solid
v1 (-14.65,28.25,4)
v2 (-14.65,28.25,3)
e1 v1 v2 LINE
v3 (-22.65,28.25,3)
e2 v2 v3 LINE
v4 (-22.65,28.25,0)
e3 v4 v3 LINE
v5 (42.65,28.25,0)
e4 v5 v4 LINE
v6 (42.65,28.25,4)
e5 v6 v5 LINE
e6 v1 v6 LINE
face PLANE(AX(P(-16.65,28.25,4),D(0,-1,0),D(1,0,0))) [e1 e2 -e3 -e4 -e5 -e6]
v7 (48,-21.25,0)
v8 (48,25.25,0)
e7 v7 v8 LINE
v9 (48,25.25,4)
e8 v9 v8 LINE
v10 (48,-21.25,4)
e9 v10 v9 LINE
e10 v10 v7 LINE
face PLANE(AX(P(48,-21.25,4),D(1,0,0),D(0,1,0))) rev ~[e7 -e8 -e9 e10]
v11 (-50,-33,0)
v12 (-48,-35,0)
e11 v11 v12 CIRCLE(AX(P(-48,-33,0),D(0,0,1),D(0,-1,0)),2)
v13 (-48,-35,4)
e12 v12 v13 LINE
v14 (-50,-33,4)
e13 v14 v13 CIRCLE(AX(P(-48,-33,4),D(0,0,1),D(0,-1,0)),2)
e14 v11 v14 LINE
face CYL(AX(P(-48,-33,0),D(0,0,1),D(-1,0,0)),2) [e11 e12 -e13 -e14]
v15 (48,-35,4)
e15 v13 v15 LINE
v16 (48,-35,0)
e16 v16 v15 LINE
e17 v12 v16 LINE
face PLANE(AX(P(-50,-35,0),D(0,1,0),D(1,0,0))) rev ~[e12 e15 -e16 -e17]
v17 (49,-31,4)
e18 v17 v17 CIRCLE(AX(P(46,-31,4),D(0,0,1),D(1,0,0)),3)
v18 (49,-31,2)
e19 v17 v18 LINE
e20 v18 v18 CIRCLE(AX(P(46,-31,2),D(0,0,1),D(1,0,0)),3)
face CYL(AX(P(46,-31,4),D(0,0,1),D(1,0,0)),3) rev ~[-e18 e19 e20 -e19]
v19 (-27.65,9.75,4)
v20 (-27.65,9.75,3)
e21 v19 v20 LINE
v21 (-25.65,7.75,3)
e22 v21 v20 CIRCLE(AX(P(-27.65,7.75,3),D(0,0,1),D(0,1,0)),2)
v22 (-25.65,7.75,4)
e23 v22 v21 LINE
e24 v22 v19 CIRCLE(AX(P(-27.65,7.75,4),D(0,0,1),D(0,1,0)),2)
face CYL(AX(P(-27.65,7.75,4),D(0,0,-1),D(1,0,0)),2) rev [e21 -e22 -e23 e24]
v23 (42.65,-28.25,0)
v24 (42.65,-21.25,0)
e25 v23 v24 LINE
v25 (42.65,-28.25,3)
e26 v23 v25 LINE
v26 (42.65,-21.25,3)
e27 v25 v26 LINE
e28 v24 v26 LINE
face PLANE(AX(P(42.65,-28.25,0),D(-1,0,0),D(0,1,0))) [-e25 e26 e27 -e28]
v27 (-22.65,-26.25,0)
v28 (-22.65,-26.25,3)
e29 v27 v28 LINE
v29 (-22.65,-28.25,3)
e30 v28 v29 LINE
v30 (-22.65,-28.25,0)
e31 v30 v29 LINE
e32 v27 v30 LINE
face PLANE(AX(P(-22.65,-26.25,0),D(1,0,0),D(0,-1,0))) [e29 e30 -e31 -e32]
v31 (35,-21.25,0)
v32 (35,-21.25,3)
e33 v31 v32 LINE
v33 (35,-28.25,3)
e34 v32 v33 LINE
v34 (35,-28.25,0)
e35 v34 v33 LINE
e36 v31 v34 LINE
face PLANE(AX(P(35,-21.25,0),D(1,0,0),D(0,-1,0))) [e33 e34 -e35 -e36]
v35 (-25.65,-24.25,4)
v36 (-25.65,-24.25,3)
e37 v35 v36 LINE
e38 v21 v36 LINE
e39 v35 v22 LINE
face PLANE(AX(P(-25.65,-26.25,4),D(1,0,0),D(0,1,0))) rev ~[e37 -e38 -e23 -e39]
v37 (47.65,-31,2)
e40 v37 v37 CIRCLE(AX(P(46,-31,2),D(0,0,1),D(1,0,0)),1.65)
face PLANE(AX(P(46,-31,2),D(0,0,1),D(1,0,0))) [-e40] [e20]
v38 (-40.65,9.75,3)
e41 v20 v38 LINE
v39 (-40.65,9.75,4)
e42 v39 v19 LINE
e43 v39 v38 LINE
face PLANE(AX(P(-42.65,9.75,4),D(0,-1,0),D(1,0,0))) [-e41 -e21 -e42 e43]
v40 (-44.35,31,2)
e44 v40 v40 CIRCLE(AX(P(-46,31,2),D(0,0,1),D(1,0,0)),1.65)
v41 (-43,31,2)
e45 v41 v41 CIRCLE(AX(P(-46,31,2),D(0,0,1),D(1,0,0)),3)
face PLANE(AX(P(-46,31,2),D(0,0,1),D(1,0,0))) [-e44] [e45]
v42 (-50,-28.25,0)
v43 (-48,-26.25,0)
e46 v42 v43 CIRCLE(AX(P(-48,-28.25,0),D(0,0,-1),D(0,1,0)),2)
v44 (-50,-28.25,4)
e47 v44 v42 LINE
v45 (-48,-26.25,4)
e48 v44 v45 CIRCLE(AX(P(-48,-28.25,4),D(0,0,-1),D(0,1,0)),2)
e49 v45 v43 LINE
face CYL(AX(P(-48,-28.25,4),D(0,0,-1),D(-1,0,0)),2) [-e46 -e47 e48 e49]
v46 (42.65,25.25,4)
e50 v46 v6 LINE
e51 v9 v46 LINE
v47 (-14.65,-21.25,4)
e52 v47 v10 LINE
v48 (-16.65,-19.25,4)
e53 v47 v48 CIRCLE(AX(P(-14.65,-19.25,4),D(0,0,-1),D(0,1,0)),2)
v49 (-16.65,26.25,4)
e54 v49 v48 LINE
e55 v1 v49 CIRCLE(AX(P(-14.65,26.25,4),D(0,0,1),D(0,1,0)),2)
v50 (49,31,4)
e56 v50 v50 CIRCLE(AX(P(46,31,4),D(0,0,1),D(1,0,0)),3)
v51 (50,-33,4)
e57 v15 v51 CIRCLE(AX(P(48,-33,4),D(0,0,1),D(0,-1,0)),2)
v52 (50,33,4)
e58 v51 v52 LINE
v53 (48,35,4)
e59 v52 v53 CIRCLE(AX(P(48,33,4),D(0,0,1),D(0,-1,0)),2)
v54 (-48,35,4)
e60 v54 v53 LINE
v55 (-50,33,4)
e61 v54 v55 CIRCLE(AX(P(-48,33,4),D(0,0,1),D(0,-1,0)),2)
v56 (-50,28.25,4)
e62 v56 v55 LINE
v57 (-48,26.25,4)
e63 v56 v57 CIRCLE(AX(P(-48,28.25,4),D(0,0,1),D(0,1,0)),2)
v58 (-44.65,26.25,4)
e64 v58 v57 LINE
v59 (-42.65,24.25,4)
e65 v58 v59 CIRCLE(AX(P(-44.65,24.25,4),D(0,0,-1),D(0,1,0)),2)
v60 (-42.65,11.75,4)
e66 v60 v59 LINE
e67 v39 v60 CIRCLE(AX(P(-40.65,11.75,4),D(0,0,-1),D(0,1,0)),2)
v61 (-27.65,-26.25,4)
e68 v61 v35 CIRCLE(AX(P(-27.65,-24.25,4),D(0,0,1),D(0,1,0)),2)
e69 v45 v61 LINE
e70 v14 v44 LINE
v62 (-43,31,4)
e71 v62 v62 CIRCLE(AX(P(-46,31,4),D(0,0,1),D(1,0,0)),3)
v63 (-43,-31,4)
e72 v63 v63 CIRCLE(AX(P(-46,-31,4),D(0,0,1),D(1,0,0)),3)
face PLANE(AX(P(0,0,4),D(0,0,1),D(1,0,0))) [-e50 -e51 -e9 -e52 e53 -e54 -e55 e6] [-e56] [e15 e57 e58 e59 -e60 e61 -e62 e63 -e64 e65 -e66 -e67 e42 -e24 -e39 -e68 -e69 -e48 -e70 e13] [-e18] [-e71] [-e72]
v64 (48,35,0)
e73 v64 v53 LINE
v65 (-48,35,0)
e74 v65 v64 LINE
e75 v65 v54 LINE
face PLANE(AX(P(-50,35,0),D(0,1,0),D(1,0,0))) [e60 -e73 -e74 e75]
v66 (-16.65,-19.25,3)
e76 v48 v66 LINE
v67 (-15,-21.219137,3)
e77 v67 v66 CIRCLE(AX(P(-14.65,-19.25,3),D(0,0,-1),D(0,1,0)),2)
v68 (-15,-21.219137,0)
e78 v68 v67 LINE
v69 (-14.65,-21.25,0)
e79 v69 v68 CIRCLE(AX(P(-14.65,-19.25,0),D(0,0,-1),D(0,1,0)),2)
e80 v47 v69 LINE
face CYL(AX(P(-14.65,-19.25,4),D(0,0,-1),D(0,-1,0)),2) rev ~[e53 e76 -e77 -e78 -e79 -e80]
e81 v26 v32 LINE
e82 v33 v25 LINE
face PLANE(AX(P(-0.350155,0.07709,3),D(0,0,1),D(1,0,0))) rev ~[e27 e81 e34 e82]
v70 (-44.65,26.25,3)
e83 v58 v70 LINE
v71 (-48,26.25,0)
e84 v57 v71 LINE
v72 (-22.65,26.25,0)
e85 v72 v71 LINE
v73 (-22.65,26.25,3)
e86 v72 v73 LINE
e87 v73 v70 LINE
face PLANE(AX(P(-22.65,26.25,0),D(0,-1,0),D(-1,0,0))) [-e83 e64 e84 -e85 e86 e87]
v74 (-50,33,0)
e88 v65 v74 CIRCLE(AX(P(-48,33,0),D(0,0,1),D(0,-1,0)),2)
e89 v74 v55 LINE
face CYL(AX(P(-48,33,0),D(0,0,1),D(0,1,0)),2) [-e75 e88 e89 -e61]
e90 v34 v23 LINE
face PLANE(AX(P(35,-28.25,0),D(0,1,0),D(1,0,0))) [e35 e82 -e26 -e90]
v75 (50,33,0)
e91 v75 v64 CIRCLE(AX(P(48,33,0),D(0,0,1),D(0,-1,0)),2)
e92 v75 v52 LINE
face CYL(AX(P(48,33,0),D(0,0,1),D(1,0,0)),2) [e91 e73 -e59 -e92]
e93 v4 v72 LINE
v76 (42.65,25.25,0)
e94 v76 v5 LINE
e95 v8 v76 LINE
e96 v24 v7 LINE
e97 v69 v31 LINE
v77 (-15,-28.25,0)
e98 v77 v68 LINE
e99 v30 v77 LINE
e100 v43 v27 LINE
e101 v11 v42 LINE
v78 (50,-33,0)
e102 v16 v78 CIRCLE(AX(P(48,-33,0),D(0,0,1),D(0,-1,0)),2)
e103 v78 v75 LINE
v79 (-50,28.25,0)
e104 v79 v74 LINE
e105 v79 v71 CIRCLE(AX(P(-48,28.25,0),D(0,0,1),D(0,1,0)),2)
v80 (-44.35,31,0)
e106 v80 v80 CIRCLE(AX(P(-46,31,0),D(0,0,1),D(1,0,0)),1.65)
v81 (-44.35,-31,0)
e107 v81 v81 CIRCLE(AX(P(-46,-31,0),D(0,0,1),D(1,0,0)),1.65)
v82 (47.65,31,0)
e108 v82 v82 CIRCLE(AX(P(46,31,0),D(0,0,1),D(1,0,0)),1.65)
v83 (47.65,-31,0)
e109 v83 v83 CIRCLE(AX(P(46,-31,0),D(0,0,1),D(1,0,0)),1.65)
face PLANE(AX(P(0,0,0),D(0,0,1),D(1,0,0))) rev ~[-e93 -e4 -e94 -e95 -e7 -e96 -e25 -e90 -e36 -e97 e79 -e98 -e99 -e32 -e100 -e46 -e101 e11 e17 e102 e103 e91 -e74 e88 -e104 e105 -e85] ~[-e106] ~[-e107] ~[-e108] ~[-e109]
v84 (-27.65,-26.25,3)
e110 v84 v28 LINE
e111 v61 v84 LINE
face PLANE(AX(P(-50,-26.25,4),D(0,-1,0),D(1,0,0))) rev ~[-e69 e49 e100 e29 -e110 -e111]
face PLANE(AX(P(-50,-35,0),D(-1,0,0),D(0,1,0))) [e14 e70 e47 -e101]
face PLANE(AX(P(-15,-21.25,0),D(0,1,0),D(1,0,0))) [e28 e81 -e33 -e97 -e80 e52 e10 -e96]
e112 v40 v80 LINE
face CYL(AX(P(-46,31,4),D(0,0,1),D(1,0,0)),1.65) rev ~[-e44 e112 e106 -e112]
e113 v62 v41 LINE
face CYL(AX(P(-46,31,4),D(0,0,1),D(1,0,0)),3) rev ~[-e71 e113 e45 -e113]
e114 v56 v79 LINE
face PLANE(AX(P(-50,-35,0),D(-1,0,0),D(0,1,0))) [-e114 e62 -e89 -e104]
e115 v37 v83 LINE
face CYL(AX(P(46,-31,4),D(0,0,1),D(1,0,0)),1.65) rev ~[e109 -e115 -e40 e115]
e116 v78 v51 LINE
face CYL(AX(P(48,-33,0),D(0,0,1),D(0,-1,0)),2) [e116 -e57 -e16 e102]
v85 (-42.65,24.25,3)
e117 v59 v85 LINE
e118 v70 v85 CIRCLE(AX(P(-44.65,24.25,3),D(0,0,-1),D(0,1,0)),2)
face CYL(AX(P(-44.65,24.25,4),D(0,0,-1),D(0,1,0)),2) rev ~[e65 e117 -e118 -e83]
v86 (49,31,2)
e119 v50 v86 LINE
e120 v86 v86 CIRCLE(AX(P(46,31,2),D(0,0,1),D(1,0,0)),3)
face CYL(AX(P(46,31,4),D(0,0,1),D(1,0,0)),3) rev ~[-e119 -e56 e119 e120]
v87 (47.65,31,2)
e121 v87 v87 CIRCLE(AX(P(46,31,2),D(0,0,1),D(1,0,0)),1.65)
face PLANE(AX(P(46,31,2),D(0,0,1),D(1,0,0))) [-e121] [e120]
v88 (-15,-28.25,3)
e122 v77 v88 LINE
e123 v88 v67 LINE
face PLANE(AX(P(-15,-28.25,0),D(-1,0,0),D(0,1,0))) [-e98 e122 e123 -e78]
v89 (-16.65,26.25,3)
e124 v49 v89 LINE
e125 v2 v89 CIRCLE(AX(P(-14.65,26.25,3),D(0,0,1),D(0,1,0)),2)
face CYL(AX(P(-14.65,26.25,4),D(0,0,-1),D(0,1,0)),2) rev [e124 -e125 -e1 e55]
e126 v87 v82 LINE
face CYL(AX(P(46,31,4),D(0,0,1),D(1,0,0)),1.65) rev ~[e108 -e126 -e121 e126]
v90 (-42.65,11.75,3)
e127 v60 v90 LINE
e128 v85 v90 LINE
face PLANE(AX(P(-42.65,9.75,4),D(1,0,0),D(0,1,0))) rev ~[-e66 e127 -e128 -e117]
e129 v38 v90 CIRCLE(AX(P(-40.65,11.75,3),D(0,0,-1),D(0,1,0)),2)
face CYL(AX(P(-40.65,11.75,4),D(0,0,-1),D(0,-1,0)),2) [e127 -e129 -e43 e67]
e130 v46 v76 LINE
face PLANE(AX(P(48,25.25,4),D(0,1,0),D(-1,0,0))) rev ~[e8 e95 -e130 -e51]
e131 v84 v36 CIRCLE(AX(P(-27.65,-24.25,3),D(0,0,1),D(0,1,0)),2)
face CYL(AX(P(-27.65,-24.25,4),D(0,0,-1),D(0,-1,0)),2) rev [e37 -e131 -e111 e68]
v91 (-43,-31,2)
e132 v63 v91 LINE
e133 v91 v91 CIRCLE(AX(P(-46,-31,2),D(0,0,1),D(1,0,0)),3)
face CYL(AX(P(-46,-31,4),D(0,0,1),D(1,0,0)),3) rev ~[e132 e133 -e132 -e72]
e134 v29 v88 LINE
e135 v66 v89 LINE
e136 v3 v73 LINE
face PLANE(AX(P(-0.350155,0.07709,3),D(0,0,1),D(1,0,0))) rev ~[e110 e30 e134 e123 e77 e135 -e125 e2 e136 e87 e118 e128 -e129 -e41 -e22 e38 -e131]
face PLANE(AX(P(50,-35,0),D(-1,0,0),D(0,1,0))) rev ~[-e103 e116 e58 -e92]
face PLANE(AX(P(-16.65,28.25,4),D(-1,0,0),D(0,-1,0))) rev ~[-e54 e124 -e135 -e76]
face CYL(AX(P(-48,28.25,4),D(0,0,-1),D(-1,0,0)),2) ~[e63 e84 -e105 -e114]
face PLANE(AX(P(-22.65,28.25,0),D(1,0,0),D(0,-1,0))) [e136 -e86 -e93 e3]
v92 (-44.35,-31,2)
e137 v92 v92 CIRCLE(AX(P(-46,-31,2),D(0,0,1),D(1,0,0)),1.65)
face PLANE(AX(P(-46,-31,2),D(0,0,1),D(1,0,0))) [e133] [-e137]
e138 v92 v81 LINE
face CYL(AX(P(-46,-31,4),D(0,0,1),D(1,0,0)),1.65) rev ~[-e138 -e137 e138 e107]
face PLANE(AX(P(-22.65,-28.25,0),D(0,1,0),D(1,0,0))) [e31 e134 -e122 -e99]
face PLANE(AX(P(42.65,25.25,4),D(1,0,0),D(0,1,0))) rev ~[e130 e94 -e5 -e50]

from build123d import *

# Parameters (mm, degrees)
F0_W     = 100
F0_H     = 70
F1_DEPTH = 4
F2_R     = 1.65
F3_DEPTH = 4
F2_W     = 17
F2_H     = 36
F2_W_2   = 59.3
F2_H_2   = 3
F4_DEPTH = 4
F6_DEPTH = 3
F7_R     = 3
F8_DEPTH = 2
F9_R     = 2


with BuildPart() as f1:
    # F0 (on Top) → F1 (new body)
    with BuildSketch(Plane.XY):
        Rectangle(F0_W, F0_H)
    extrude(amount=F1_DEPTH)

    # F2 (on face) → F3 (cut, through all)
    with BuildSketch(Plane.XY.offset(4)):
        with Locations((-46, 31)):
            Circle(F2_R)
        with Locations((46, 31)):
            Circle(F2_R)
        with Locations((46, -31)):
            Circle(F2_R)
        with Locations((-46, -31)):
            Circle(F2_R)
    extrude(amount=-F3_DEPTH, mode=Mode.SUBTRACT)

    # F2 (on face) → F4 (cut, through all)
    with BuildSketch(Plane.XY.offset(4)):
        with Locations((-34.15, -8.25)):
            Rectangle(F2_W, F2_H)
        Polygon((-42.65, -26.25), (-42.65, 9.75), (-42.65, 26.25), (-50, 26.25), (-50, -26.25), align=None)
        with Locations((13, 26.75)):
            Rectangle(F2_W_2, F2_H_2)
        Polygon((42.65, 25.25), (-16.65, 25.25), (-16.65, -21.25), (-15, -21.25), (35, -21.25), (42.65, -21.25), (48, -21.25), (48, 25.25), align=None)
    extrude(amount=-F4_DEPTH, mode=Mode.SUBTRACT)

    # F5 (on face) → F6 (cut)
    with BuildSketch(Plane.XY):
        Polygon((-50, -26.25), (-22.65, -26.25), (-22.65, -28.25), (-15, -28.25), (-15, -21.25), (35, -21.25), (35, -28.25), (42.65, -28.25), (42.65, -21.25), (48, -21.25), (48, 25.25), (42.65, 25.25), (42.65, 28.25), (-22.65, 28.25), (-22.65, 26.25), (-50, 26.25), align=None)
    extrude(amount=F6_DEPTH, mode=Mode.SUBTRACT)

    # F7 (on face) → F8 (cut)
    with BuildSketch(Plane.XY.offset(4)):
        with Locations((-46, 31)):
            Circle(F7_R)
        with Locations((46, 31)):
            Circle(F7_R)
        with Locations((46, -31)):
            Circle(F7_R)
        with Locations((-46, -31)):
            Circle(F7_R)
    extrude(amount=-F8_DEPTH, mode=Mode.SUBTRACT)

    # F9
    f9_edges = [f1.edges().sort_by_distance(p)[0] for p in [
        (-50, 35, 2),
        (-50, -35, 2),
        (50, -35, 2),
        (50, 35, 2),
        (-16.65, -21.25, 3.5),
        (-16.65, 28.25, 3.5),
        (-50, 26.25, 2),
        (-50, -26.25, 2),
        (-42.65, 26.25, 3.5),
        (-42.65, 9.75, 3.5),
        (-25.65, 9.75, 3.5),
        (-25.65, -26.25, 3.5),
    ]]
    fillet(f9_edges, radius=F9_R)


solid = f1.part
